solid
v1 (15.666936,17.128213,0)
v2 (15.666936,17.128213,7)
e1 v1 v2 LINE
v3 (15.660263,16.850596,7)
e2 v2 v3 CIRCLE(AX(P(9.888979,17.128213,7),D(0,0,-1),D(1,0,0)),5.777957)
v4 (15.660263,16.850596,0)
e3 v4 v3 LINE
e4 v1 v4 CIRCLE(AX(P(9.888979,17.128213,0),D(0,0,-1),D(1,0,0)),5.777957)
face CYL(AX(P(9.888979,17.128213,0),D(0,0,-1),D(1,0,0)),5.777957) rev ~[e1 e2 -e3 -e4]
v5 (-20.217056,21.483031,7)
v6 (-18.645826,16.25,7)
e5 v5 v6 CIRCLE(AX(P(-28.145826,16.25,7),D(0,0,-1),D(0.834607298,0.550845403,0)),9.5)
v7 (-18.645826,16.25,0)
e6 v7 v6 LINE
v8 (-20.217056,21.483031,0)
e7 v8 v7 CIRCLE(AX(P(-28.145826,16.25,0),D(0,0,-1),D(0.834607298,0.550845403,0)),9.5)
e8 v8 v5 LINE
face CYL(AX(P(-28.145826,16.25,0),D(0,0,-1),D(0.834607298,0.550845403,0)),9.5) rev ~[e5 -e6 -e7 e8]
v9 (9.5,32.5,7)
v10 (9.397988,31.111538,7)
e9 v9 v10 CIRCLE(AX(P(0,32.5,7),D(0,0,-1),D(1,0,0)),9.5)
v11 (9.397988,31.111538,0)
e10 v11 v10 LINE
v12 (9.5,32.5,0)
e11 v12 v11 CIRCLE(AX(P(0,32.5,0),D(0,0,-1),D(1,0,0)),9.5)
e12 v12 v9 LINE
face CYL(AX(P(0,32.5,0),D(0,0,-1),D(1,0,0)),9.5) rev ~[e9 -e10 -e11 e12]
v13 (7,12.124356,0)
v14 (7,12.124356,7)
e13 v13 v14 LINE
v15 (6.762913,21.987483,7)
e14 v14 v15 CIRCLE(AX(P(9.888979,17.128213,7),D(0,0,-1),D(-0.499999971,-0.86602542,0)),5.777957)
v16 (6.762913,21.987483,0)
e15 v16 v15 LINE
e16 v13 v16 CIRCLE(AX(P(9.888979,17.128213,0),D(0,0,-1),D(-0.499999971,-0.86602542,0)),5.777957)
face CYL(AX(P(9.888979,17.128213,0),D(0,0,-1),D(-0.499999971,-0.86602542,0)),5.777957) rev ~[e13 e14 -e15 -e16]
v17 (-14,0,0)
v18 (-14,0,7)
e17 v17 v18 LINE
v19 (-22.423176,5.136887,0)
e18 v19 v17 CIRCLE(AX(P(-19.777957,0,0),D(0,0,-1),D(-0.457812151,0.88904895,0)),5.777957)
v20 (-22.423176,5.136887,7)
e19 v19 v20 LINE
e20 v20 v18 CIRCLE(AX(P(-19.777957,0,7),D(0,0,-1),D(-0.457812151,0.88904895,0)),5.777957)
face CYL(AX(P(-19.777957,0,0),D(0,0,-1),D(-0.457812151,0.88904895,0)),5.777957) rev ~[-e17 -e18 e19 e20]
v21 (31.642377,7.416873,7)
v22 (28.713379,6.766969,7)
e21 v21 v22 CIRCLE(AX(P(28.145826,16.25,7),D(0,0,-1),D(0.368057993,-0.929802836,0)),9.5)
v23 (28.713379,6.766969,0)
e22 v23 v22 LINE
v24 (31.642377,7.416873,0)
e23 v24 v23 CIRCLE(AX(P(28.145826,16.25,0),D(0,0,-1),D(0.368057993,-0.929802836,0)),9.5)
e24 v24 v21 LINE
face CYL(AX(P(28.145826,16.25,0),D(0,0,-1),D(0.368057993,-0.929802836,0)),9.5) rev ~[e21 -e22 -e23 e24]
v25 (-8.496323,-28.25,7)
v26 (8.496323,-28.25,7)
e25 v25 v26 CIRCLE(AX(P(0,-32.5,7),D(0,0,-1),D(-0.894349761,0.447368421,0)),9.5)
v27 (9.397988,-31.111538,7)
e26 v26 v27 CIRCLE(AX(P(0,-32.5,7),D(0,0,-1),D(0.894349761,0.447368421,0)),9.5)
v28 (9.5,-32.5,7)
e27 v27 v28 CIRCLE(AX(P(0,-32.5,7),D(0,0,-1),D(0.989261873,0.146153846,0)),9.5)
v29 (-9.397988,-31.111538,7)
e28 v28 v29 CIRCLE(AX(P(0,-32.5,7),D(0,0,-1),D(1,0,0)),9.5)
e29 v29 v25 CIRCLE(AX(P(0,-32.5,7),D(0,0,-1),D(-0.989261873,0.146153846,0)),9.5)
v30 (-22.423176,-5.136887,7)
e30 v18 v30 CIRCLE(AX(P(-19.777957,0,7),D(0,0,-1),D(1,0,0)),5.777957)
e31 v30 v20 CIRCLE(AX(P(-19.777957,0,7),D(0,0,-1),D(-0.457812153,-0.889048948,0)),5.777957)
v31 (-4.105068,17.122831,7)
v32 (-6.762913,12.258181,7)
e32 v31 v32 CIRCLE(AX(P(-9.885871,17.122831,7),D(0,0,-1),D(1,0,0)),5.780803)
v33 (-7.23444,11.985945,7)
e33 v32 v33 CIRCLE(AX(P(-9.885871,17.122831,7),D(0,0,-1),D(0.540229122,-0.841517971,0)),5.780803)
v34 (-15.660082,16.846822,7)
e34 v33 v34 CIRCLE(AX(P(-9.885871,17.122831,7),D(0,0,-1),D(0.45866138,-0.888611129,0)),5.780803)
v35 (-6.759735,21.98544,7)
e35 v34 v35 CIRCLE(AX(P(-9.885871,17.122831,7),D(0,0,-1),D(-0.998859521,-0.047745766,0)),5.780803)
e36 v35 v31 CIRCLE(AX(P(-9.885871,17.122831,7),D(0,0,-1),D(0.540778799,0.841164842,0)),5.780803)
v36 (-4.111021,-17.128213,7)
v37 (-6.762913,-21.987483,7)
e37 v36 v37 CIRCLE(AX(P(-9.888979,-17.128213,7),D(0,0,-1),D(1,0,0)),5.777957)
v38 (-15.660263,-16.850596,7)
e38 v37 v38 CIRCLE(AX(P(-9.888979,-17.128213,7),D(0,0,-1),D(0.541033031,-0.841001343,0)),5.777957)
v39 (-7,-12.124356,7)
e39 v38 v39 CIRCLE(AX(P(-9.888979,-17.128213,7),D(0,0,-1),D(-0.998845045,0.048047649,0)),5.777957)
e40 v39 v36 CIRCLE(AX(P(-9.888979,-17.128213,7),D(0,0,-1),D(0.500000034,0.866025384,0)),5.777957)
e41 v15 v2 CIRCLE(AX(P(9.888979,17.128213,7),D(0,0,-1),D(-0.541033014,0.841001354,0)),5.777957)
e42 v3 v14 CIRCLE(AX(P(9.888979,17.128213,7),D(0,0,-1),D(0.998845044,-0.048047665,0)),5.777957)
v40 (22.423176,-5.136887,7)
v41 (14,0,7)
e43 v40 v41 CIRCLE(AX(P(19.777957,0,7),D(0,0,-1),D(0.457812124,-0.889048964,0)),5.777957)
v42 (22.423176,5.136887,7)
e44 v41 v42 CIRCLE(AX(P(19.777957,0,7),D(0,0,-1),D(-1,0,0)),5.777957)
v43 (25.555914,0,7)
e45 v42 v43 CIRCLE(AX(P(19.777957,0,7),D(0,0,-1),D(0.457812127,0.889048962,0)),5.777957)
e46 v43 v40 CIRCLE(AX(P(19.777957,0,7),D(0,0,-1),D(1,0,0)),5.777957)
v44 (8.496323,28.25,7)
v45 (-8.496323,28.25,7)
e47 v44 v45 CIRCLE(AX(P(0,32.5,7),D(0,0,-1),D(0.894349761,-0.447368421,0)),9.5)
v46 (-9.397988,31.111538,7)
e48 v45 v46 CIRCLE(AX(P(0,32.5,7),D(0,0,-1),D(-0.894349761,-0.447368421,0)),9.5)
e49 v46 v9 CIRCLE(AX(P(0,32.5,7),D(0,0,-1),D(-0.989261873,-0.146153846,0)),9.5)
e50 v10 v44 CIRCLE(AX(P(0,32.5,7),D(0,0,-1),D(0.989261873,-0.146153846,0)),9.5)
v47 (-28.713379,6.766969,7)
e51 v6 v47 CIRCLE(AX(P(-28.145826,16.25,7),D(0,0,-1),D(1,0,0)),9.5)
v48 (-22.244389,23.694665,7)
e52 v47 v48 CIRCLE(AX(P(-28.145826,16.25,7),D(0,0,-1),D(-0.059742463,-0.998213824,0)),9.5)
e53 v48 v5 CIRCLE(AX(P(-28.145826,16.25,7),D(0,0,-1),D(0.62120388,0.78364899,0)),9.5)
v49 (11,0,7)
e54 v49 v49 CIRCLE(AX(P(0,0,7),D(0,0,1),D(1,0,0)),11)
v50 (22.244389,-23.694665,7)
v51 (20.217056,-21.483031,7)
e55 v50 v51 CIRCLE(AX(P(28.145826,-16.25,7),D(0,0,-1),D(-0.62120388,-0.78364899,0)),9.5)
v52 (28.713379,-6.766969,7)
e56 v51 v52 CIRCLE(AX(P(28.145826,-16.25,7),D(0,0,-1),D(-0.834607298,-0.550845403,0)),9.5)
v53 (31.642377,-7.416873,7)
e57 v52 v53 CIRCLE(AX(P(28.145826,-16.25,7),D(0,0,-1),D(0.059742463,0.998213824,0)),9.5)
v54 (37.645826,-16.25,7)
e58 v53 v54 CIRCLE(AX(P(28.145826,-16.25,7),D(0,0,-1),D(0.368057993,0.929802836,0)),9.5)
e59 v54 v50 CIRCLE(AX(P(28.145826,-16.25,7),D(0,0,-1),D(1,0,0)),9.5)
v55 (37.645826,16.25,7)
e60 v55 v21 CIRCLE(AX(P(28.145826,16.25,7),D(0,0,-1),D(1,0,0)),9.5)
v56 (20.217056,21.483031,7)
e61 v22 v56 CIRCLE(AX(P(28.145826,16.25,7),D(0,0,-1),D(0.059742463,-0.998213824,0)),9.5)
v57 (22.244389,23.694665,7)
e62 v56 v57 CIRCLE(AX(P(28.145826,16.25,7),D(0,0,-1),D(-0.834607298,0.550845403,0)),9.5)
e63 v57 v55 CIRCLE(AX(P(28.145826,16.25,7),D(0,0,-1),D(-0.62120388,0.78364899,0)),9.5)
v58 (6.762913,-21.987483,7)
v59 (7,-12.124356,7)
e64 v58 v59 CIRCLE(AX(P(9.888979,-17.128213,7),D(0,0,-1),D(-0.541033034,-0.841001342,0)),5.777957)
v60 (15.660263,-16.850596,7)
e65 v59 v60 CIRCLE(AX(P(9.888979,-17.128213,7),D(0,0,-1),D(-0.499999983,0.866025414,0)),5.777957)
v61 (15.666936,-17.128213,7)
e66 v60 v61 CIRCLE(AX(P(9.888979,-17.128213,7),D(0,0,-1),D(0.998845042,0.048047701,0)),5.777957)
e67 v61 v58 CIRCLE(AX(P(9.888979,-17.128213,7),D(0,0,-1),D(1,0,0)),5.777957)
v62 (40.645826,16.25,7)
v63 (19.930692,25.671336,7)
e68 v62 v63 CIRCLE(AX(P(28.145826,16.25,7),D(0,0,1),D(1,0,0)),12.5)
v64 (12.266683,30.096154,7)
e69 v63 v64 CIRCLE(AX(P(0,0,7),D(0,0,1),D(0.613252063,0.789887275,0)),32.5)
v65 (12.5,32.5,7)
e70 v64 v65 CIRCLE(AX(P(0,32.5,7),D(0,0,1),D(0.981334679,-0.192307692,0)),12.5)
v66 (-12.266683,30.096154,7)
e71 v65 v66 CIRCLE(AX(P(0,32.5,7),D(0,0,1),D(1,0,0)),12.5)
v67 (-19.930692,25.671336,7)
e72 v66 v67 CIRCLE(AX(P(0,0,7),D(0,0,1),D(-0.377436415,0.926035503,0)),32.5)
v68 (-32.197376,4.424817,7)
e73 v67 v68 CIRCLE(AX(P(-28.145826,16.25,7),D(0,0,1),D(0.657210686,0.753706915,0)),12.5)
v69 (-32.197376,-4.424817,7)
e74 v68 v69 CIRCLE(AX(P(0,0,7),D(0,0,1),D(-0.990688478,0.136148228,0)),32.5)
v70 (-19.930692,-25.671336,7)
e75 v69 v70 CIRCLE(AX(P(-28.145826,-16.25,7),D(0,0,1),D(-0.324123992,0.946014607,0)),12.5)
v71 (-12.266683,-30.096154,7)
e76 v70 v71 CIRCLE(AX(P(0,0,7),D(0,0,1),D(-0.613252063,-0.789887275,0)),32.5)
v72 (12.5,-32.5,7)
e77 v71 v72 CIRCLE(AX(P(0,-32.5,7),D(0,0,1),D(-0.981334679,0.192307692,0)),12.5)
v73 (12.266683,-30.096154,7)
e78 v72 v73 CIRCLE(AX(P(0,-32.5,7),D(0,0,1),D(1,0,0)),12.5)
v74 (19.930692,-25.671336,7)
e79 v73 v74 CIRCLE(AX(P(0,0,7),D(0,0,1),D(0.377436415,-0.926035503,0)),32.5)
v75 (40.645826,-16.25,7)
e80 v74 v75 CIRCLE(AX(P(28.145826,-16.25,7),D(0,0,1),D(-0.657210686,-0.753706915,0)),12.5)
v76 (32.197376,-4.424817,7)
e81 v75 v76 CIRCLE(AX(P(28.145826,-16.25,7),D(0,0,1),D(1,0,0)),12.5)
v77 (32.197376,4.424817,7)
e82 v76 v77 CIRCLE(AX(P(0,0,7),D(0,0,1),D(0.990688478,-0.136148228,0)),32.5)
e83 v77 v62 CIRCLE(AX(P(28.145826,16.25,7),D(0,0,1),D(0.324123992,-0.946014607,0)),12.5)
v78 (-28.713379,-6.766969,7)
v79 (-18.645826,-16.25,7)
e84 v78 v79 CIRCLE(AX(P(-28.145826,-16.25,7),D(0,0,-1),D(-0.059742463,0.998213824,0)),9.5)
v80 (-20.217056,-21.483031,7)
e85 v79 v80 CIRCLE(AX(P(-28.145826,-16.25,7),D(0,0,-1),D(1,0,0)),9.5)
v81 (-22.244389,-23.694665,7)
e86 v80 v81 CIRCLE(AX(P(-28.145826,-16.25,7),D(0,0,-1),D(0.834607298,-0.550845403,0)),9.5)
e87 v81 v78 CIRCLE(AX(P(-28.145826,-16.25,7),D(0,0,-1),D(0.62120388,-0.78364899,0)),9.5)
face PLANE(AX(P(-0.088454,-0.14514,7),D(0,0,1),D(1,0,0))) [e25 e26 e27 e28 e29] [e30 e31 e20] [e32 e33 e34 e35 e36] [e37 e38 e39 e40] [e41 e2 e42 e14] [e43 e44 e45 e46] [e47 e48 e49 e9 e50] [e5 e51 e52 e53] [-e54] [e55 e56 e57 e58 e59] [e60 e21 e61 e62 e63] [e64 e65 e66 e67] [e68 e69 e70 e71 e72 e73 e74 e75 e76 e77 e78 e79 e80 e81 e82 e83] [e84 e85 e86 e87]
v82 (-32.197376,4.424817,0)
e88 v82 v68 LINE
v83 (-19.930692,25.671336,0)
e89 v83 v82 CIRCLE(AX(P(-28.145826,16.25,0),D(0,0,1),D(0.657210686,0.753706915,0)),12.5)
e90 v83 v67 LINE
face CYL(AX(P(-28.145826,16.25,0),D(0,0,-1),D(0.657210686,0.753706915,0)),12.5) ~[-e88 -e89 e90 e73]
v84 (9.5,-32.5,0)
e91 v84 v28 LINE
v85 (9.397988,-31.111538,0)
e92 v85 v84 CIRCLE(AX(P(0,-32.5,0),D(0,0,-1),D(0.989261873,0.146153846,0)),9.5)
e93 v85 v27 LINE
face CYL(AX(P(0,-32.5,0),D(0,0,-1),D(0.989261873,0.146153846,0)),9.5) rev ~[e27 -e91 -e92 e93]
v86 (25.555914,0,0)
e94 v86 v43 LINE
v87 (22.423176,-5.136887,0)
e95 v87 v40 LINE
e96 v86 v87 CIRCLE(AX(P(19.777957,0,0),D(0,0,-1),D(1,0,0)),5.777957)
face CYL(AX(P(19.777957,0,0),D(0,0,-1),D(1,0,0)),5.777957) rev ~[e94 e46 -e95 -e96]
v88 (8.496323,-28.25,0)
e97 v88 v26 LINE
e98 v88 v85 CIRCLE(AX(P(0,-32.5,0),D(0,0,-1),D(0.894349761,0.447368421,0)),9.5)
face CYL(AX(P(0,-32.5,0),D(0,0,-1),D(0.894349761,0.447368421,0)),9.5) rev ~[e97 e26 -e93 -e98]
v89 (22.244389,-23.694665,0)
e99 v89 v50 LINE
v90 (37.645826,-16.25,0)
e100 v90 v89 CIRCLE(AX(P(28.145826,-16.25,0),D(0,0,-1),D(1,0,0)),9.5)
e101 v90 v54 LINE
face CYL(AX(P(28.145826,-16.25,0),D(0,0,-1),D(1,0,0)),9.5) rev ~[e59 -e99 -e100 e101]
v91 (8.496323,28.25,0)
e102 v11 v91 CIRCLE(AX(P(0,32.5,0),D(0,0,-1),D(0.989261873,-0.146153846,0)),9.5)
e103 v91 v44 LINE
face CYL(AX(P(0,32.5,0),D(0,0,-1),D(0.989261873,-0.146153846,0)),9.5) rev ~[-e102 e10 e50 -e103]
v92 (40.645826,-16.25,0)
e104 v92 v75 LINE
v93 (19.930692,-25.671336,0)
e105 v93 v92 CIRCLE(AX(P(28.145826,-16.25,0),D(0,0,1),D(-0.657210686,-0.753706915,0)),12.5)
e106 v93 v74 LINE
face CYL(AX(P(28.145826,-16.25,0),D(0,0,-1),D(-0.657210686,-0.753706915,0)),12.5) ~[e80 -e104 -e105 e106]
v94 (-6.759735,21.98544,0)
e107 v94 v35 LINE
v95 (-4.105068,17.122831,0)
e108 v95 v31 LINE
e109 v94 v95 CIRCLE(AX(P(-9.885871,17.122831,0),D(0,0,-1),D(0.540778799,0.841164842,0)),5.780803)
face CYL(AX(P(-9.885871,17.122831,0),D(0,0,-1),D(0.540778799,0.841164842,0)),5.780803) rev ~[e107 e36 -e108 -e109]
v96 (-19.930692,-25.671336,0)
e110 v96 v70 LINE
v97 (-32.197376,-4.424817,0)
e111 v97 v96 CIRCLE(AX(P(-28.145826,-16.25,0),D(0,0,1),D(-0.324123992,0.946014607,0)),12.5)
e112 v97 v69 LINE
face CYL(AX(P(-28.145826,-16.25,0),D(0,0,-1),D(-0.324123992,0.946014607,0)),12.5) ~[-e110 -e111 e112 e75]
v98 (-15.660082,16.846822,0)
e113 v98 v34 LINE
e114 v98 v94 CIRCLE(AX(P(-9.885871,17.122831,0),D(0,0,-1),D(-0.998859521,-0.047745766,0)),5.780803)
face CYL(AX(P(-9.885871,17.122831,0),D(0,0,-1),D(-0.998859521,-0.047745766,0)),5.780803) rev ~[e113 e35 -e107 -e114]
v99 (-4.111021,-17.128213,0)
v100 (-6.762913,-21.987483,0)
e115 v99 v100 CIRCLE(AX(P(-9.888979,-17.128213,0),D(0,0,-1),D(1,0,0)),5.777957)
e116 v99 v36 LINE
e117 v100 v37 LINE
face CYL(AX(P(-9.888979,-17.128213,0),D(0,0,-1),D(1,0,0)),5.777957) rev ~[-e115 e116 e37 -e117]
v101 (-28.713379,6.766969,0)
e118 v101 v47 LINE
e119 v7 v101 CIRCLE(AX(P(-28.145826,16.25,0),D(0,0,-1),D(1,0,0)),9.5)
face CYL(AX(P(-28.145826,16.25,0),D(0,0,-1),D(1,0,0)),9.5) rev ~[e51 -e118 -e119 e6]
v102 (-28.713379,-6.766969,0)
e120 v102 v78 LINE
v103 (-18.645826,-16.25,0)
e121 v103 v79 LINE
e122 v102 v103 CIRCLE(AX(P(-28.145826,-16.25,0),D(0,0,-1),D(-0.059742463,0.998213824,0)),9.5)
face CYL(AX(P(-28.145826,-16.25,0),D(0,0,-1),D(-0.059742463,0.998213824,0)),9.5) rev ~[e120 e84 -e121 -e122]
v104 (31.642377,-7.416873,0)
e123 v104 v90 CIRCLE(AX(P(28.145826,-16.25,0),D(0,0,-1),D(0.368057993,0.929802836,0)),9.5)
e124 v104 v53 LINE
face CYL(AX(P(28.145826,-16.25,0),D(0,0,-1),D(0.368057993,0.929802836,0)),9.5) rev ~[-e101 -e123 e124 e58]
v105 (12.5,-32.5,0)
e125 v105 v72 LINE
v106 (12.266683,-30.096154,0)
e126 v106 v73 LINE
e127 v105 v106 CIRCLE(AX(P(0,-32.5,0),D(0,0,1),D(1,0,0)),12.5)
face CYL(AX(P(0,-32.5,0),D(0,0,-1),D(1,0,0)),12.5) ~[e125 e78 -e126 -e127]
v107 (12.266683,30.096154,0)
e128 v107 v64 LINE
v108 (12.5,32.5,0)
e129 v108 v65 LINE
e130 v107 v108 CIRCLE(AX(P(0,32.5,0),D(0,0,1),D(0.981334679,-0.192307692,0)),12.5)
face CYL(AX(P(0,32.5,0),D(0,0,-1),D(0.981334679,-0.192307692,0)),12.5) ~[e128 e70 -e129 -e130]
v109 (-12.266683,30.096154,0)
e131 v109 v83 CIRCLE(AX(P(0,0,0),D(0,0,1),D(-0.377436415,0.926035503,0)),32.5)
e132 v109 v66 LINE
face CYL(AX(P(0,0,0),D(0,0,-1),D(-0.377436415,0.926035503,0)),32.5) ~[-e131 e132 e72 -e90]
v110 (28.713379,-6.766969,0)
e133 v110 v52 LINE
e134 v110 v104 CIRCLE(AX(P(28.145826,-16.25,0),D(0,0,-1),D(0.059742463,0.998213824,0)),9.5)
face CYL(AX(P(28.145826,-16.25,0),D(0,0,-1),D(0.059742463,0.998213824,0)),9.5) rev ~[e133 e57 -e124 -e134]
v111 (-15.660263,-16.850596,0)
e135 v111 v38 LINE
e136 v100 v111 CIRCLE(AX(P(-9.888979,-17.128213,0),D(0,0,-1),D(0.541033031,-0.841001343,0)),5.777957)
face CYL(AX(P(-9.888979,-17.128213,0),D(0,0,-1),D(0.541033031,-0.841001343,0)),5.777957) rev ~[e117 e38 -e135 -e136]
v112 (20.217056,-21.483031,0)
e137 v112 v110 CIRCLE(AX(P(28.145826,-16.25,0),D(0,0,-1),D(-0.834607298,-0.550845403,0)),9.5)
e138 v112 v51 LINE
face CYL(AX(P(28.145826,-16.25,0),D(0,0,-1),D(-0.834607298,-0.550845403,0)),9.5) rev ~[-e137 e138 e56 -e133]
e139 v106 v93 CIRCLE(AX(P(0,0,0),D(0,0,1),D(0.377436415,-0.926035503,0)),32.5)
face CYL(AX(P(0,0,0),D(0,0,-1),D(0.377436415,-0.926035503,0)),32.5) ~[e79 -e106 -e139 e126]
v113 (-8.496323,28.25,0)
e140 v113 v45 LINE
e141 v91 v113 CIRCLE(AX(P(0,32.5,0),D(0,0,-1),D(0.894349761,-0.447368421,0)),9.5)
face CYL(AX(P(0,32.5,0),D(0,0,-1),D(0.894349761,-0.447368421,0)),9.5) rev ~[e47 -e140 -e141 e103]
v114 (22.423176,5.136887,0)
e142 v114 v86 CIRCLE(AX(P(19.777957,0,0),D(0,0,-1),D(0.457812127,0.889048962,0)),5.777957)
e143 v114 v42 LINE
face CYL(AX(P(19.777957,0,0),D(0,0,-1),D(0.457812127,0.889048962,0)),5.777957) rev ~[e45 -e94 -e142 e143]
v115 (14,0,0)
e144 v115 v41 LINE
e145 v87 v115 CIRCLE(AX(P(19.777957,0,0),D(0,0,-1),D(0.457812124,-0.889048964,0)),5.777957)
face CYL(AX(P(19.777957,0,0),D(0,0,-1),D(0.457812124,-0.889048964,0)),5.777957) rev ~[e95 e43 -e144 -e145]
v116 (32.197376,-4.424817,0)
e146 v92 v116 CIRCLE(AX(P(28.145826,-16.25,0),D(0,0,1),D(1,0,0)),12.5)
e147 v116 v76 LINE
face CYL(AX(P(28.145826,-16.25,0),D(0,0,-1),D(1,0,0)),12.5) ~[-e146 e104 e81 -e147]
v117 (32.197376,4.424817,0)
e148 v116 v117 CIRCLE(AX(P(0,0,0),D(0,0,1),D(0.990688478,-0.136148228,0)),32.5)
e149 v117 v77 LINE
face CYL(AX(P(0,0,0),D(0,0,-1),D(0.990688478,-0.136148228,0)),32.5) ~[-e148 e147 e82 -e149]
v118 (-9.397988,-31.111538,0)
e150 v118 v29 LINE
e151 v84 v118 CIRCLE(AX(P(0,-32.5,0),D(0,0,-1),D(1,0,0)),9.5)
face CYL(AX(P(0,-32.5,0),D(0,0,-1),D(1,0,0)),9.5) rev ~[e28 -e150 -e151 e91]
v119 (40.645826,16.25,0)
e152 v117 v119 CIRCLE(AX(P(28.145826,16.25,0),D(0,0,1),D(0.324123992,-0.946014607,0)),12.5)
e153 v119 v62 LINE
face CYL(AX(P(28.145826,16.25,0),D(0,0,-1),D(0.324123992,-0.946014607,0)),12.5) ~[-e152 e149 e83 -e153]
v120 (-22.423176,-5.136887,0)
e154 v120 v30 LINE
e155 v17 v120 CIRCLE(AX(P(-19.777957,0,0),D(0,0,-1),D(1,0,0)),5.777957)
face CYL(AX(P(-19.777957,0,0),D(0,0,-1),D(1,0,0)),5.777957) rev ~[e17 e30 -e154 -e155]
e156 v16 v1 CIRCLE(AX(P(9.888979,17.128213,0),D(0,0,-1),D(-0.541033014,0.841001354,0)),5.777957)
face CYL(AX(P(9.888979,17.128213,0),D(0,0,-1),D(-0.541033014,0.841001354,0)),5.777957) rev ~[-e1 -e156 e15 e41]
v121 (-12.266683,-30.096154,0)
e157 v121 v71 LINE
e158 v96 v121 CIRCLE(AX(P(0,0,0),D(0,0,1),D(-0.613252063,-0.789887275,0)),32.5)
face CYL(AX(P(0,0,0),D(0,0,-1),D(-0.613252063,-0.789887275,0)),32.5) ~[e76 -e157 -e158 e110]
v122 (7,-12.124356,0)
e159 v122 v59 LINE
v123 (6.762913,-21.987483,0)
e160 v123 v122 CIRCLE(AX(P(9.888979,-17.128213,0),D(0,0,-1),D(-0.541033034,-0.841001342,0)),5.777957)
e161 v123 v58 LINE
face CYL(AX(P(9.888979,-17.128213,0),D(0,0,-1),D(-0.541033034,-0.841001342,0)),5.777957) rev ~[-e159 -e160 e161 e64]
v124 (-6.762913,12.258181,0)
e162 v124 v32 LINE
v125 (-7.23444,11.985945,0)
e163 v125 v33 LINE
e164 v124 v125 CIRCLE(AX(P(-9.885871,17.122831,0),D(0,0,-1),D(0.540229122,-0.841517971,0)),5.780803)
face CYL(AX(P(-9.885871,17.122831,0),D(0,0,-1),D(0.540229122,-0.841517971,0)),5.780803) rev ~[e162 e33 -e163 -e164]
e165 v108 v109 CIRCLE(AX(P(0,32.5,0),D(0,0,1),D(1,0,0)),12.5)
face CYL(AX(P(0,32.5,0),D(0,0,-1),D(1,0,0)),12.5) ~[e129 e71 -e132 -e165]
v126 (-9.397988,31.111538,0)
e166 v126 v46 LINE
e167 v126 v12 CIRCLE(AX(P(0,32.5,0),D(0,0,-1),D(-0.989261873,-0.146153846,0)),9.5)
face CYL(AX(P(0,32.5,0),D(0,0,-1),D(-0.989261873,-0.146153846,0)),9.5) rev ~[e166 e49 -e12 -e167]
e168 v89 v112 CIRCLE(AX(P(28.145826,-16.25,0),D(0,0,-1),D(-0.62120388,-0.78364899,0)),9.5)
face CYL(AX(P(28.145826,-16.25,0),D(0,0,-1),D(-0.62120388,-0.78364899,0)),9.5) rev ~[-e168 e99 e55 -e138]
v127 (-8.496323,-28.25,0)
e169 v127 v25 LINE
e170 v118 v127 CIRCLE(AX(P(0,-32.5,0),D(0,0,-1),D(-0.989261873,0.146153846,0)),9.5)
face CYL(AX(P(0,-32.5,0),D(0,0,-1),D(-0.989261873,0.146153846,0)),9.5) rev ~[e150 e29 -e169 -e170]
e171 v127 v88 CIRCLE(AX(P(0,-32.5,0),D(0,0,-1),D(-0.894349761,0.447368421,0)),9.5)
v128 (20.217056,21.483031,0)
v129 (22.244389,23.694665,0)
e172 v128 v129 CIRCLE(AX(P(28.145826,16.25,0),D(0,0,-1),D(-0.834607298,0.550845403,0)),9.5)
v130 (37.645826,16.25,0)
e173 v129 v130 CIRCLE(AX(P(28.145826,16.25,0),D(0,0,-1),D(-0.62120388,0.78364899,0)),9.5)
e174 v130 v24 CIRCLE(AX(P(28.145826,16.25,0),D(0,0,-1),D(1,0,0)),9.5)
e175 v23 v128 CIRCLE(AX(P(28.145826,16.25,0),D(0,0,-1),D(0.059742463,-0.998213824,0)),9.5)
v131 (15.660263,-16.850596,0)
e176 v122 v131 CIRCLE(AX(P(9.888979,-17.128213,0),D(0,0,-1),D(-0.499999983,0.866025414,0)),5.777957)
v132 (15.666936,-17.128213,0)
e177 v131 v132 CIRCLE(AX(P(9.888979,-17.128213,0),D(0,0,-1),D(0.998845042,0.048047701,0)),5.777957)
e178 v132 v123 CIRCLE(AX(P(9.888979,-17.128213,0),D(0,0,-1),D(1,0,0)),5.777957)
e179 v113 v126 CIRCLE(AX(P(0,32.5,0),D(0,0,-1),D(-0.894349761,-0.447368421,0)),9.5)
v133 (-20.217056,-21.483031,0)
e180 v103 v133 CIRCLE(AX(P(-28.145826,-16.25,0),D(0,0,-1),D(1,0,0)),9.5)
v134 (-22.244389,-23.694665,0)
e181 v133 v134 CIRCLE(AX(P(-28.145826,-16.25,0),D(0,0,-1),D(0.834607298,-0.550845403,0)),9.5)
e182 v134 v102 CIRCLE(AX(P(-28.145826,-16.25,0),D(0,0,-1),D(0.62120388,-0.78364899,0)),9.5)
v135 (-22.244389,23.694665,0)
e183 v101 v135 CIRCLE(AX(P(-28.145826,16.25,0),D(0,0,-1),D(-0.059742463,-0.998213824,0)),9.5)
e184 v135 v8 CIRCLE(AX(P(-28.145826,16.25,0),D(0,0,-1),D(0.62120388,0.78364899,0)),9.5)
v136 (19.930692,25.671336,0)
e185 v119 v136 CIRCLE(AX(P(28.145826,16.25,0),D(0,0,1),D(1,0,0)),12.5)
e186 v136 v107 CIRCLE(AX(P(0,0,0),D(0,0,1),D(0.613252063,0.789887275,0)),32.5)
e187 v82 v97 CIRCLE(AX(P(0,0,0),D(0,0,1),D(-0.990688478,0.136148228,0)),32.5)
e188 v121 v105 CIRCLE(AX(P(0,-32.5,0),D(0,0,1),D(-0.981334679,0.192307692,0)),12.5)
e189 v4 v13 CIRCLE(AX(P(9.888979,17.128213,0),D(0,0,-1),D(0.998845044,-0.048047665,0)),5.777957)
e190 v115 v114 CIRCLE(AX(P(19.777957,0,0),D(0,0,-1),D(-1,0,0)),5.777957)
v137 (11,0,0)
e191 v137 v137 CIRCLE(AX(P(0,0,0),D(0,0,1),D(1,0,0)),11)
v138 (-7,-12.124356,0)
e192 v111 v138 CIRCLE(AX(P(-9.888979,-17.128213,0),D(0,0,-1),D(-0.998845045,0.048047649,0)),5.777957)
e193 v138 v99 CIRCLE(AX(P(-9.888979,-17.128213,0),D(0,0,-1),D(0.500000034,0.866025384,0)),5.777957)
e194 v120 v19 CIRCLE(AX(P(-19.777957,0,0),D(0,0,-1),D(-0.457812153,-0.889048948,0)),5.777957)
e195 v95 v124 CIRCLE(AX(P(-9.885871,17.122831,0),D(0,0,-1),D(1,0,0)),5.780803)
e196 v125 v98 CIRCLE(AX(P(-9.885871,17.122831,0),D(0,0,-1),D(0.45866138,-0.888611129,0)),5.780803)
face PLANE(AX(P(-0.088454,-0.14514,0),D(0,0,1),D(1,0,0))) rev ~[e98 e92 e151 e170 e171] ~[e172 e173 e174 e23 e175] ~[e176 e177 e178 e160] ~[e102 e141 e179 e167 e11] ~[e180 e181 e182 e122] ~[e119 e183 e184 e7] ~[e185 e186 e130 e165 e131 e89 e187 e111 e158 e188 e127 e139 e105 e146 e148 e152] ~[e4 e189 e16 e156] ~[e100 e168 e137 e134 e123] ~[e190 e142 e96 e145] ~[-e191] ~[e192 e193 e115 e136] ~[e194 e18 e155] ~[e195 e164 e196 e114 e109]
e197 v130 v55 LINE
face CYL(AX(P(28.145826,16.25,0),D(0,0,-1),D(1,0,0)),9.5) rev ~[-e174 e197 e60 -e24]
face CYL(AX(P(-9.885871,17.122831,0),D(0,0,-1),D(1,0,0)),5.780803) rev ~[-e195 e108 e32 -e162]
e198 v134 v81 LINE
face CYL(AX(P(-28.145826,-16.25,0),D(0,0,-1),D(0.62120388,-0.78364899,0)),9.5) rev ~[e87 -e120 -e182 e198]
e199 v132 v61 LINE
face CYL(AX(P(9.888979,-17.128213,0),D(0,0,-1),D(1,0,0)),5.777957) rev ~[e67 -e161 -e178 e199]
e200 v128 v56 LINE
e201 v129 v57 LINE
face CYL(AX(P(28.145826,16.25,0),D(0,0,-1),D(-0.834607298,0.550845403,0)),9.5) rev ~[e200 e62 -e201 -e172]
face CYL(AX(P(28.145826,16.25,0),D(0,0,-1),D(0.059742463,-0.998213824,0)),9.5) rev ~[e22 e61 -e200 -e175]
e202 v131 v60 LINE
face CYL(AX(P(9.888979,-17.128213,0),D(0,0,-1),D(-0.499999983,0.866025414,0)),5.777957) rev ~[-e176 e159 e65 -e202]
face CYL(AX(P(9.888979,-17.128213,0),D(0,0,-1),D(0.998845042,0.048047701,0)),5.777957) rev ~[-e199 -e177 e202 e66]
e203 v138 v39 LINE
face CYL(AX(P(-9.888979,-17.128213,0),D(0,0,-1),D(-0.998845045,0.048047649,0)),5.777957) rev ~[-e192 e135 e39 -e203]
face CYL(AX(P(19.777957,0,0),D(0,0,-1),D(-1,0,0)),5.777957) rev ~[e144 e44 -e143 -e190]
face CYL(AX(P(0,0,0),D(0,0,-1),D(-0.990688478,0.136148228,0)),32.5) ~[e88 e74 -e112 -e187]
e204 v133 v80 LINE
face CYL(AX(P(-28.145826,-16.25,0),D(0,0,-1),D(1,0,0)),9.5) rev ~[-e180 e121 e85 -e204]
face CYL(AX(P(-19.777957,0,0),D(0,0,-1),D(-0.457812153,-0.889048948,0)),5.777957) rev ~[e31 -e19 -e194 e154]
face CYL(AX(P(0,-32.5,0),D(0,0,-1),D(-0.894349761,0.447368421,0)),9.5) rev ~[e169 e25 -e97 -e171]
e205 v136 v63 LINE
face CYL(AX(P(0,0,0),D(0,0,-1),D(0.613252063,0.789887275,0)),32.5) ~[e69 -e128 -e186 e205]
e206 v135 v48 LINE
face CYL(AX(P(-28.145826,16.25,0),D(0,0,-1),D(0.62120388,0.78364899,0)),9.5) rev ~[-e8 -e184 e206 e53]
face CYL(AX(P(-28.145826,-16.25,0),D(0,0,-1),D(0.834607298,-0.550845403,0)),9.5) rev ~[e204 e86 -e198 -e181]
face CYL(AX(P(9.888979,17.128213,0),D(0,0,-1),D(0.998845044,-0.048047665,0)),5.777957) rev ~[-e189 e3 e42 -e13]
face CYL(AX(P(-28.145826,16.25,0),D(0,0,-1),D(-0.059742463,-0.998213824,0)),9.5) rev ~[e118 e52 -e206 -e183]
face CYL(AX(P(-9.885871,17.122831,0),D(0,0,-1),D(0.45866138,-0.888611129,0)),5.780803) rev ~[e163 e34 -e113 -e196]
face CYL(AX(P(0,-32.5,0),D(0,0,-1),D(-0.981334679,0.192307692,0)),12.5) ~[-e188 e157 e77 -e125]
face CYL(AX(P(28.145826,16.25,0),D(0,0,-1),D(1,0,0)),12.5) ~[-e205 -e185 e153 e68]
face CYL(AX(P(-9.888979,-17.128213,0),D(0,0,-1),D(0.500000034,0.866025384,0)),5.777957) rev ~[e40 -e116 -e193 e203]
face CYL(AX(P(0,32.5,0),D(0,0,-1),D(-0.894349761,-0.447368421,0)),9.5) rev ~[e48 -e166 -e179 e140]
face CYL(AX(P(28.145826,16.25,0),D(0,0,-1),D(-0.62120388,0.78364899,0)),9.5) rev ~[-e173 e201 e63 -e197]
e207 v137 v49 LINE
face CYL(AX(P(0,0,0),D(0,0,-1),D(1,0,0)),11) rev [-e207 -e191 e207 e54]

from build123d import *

# Parameters (mm, degrees)
F0_R     = 11
F1_DEPTH = 7


with BuildPart() as f1:
    # F0 (on Top) → F1 (new body)
    with BuildSketch(Plane.XY):
        with BuildLine():
            ThreePointArc((7.0000001006, -12.1243555949), (12.124355682, -6.9999999497), (14, 0))
            ThreePointArc((14, 0), (12.1243557011, 6.9999999166), (7.0000001668, 12.1243555567))
            ThreePointArc((7.0000001668, 12.1243555567), (0.1361246737, 13.9993382013), (-6.7629128968, 12.2581813149))
            ThreePointArc((-6.7629128968, 12.2581813149), (-6.99546954, 12.1165086661), (-7.2344399745, 11.9859450297))
            ThreePointArc((-7.2344399745, 11.9859450297), (-12.191844808, 6.881781759), (-14, 0))
            ThreePointArc((-14, 0), (-12.1243555958, -7.000000099), (-6.999999802, -12.1243557673))
            ThreePointArc((-6.999999802, -12.1243557673), (1.724e-07, -14), (7.0000001006, -12.1243555949))
        make_face()
        Circle(F0_R, mode=Mode.SUBTRACT)
        with BuildLine():
            ThreePointArc((22.4231761247, -5.1368869024), (16.769566617, -4.9329885231), (14, 0))
            ThreePointArc((14, 0), (12.124355682, -6.9999999497), (7.0000001006, -12.1243555949))
            ThreePointArc((7.0000001006, -12.1243555949), (12.6568763598, -12.0563762611), (15.6602625749, -16.8505958477))
            ThreePointArc((15.6602625749, -16.8505958477), (17.3205082906, -9.9999996277), (22.4231761247, -5.1368869024))
        make_face()
        with BuildLine():
            ThreePointArc((7.0000001668, 12.1243555567), (12.1243557011, 6.9999999166), (14, 0))
            ThreePointArc((14, 0), (16.769566627, 4.9329885292), (22.4231761455, 5.1368868917))
            ThreePointArc((22.4231761455, 5.1368868917), (17.3205082443, 9.9999997079), (15.6602625849, 16.8505960559))
            ThreePointArc((15.6602625849, 16.8505960559), (12.6568764848, 12.0563763294), (7.0000001668, 12.1243555567))
        make_face()
        with BuildLine():
            ThreePointArc((-6.7629128968, 12.2581813149), (0.1361246737, 13.9993382013), (7.0000001668, 12.1243555567))
            ThreePointArc((7.0000001668, 12.1243555567), (4.1126899405, 16.9893645646), (6.7629130014, 21.9874832825))
            ThreePointArc((6.7629130014, 21.9874832825), (0.0018890383, 20.0000001427), (-6.759735325, 21.9854396984))
            ThreePointArc((-6.759735325, 21.9854396984), (-4.8119543875, 19.8928592028), (-4.1050678819, 17.1228311923))
            ThreePointArc((-4.1050678819, 17.1228311923), (-4.8128595342, 14.3511458497), (-6.7629128968, 12.2581813149))
        make_face()
        with BuildLine():
            ThreePointArc((6.7629128862, -21.9874832084), (4.1126899412, -16.9893645344), (7.0000001006, -12.1243555949))
            ThreePointArc((7.0000001006, -12.1243555949), (1.724e-07, -14), (-6.999999802, -12.1243557673))
            ThreePointArc((-6.999999802, -12.1243557673), (-4.8851208082, -14.2392348866), (-4.1110213762, -17.1282134114))
            ThreePointArc((-4.1110213762, -17.1282134114), (-4.8171414782, -19.8961111559), (-6.7629128995, -21.987483217))
            ThreePointArc((-6.7629128995, -21.987483217), (-7.9e-09, -20), (6.7629128862, -21.9874832084))
        make_face()
        with BuildLine():
            ThreePointArc((15.6602625849, 16.8505960559), (17.3205082443, 9.9999997079), (22.4231761455, 5.1368868917))
            ThreePointArc((22.4231761455, 5.1368868917), (25.7437624558, 3.9829672479), (29.2543281187, 3.7992481264))
            ThreePointArc((29.2543281187, 3.7992481264), (29.0218126442, 5.2900274902), (28.7133790239, 6.7669686736))
            ThreePointArc((28.7133790239, 6.7669686736), (19.918584287, 11.5), (20.2170562899, 21.4830313264))
            ThreePointArc((20.2170562899, 21.4830313264), (19.0922045153, 22.4886132686), (17.9174094521, 23.4353672582))
            ThreePointArc((17.9174094521, 23.4353672582), (16.3212319377, 20.3032683327), (15.6602625849, 16.8505960559))
        make_face()
        with BuildLine():
            ThreePointArc((29.2543281187, 3.7992481264), (25.7437624558, 3.9829672479), (22.4231761455, 5.1368868917))
            ThreePointArc((22.4231761455, 5.1368868917), (24.7109457768, 3.0083906207), (25.5559144953, 0))
            ThreePointArc((25.5559144953, 0), (24.7109457708, -3.0083906307), (22.4231761247, -5.1368869024))
            ThreePointArc((22.4231761247, -5.1368869024), (25.7437624444, -3.9829672502), (29.2543281187, -3.7992481264))
            ThreePointArc((29.2543281187, -3.7992481264), (29.5, 0), (29.2543281187, 3.7992481264))
        make_face()
        with BuildLine():
            ThreePointArc((29.2543281187, -3.7992481264), (25.7437624444, -3.9829672502), (22.4231761247, -5.1368869024))
            ThreePointArc((22.4231761247, -5.1368869024), (17.3205082906, -9.9999996277), (15.6602625749, -16.8505958477))
            ThreePointArc((15.6602625749, -16.8505958477), (16.3212319039, -20.3032682341), (17.9174094521, -23.4353672582))
            ThreePointArc((17.9174094521, -23.4353672582), (19.0922045153, -22.4886132686), (20.2170562899, -21.4830313264))
            ThreePointArc((20.2170562899, -21.4830313264), (19.918584287, -11.5), (28.7133790239, -6.7669686736))
            ThreePointArc((28.7133790239, -6.7669686736), (29.0218126442, -5.2900274902), (29.2543281187, -3.7992481264))
        make_face()
        with BuildLine():
            ThreePointArc((-6.759735325, 21.9854396984), (0.0018890383, 20.0000001427), (6.7629130014, 21.9874832825))
            ThreePointArc((6.7629130014, 21.9874832825), (9.422530203, 24.2862356636), (11.3369186666, 27.2346153846))
            ThreePointArc((11.3369186666, 27.2346153846), (9.9296081288, 27.7786407588), (8.496322734, 28.25))
            ThreePointArc((8.496322734, 28.25), (0, 23), (-8.496322734, 28.25))
            ThreePointArc((-8.496322734, 28.25), (-9.9296081288, 27.7786407588), (-11.3369186666, 27.2346153846))
            ThreePointArc((-11.3369186666, 27.2346153846), (-9.4212888061, 24.2848117957), (-6.759735325, 21.9854396984))
        make_face()
        with BuildLine():
            ThreePointArc((11.3369186666, 27.2346153846), (9.422530203, 24.2862356636), (6.7629130014, 21.9874832825))
            ThreePointArc((6.7629130014, 21.9874832825), (12.6568764214, 22.2000505281), (15.6669358715, 17.1282134114))
            ThreePointArc((15.6669358715, 17.1282134114), (15.6652673089, 16.9893646368), (15.6602625849, 16.8505960559))
            ThreePointArc((15.6602625849, 16.8505960559), (16.3212319377, 20.3032683327), (17.9174094521, 23.4353672582))
            ThreePointArc((17.9174094521, 23.4353672582), (14.75, 25.5477494116), (11.3369186666, 27.2346153846))
        make_face()
        with BuildLine():
            ThreePointArc((-15.6602625894, -16.850596149), (-12.6568763408, -12.0563762508), (-6.999999802, -12.1243557673))
            ThreePointArc((-6.999999802, -12.1243557673), (-12.1243555958, -7.000000099), (-14, 0))
            ThreePointArc((-14, 0), (-16.7695666992, -4.9329885732), (-22.4231762959, -5.1368868142))
            ThreePointArc((-22.4231762959, -5.1368868143), (-17.4738268273, -9.741663676), (-15.645825623, -16.25))
            ThreePointArc((-15.645825623, -16.25), (-15.6494353858, -16.5503848199), (-15.6602625894, -16.850596149))
        make_face()
        with BuildLine():
            ThreePointArc((17.9174094521, -23.4353672582), (16.3212319039, -20.3032682341), (15.6602625749, -16.8505958477))
            ThreePointArc((15.6602625749, -16.8505958477), (15.6652673064, -16.9893645326), (15.6669358715, -17.1282134114))
            ThreePointArc((15.6669358715, -17.1282134114), (12.6568763613, -22.2000505609), (6.7629128862, -21.9874832084))
            ThreePointArc((6.7629128862, -21.9874832084), (9.422530158, -24.286235612), (11.3369186666, -27.2346153846))
            ThreePointArc((11.3369186666, -27.2346153846), (14.75, -25.5477494116), (17.9174094521, -23.4353672582))
        make_face()
        with BuildLine():
            ThreePointArc((11.3369186666, -27.2346153846), (9.422530158, -24.286235612), (6.7629128862, -21.9874832084))
            ThreePointArc((6.7629128862, -21.9874832084), (-7.9e-09, -20), (-6.7629128995, -21.987483217))
            ThreePointArc((-6.7629128995, -21.987483217), (-9.4225301632, -24.286235618), (-11.3369186666, -27.2346153846))
            ThreePointArc((-11.3369186666, -27.2346153846), (-9.9296081288, -27.7786407588), (-8.496322734, -28.25))
            ThreePointArc((-8.496322734, -28.25), (0, -23), (8.496322734, -28.25))
            ThreePointArc((8.496322734, -28.25), (9.9296081288, -27.7786407588), (11.3369186666, -27.2346153846))
        make_face()
        with BuildLine():
            ThreePointArc((28.7133790239, 6.7669686736), (29.0218126442, 5.2900274902), (29.2543281187, 3.7992481264))
            ThreePointArc((29.2543281187, 3.7992481264), (30.7447425948, 4.0231594198), (32.1973755284, 4.4248174067))
            ThreePointArc((32.1973755284, 4.4248174067), (31.9549148923, 5.9273446187), (31.642376555, 7.4168730576))
            ThreePointArc((31.642376555, 7.4168730576), (30.2036958653, 6.9755636254), (28.7133790239, 6.7669686736))
        make_face()
        with BuildLine():
            ThreePointArc((32.1973755284, 4.4248174067), (30.7447425948, 4.0231594198), (29.2543281187, 3.7992481264))
            ThreePointArc((29.2543281187, 3.7992481264), (29.5, 0), (29.2543281187, -3.7992481264))
            ThreePointArc((29.2543281187, -3.7992481264), (30.7447425948, -4.0231594198), (32.1973755284, -4.4248174067))
            ThreePointArc((32.1973755284, -4.4248174067), (32.5, 0), (32.1973755284, 4.4248174067))
        make_face()
        with BuildLine():
            ThreePointArc((32.1973755284, -4.4248174067), (30.7447425948, -4.0231594198), (29.2543281187, -3.7992481264))
            ThreePointArc((29.2543281187, -3.7992481264), (29.0218126442, -5.2900274902), (28.7133790239, -6.7669686736))
            ThreePointArc((28.7133790239, -6.7669686736), (30.2036958653, -6.9755636254), (31.642376555, -7.4168730576))
            ThreePointArc((31.642376555, -7.4168730576), (31.9549148923, -5.9273446187), (32.1973755284, -4.4248174067))
        make_face()
        with BuildLine():
            ThreePointArc((-14, 0), (-12.191844808, 6.881781759), (-7.2344399745, 11.9859450297))
            ThreePointArc((-7.2344399745, 11.9859450297), (-12.7746372788, 12.1155647212), (-15.660081627, 16.8468223075))
            ThreePointArc((-15.660081627, 16.8468223075), (-15.6493901322, 16.5484962731), (-15.645825623, 16.25))
            ThreePointArc((-15.645825623, 16.25), (-17.473826823, 9.7416636832), (-22.423176281, 5.1368868219))
            ThreePointArc((-22.423176281, 5.1368868219), (-16.769566692, 4.9329885689), (-14, 0))
        make_face()
        with BuildLine():
            ThreePointArc((-15.660081627, 16.8468223075), (-12.7762728806, 22.1291537044), (-6.759735325, 21.9854396984))
            ThreePointArc((-6.759735325, 21.9854396984), (-9.4212888061, 24.2848117957), (-11.3369186666, 27.2346153846))
            ThreePointArc((-11.3369186666, 27.2346153846), (-14.75, 25.5477494116), (-17.9174094521, 23.4353672582))
            ThreePointArc((-17.9174094521, 23.4353672582), (-16.3206195291, 20.3014813138), (-15.660081627, 16.8468223075))
        make_face()
        with BuildLine():
            ThreePointArc((8.496322734, 28.25), (9.9296081288, 27.7786407588), (11.3369186666, 27.2346153846))
            ThreePointArc((11.3369186666, 27.2346153846), (11.8882130364, 28.6373078299), (12.2666834829, 30.0961538462))
            ThreePointArc((12.2666834829, 30.0961538462), (10.8442264294, 30.6374403818), (9.3979877929, 31.1115384615))
            ThreePointArc((9.3979877929, 31.1115384615), (9.0608326273, 29.6449497203), (8.496322734, 28.25))
        make_face()
        with BuildLine():
            ThreePointArc((12.2666834829, 30.0961538462), (11.8882130364, 28.6373078299), (11.3369186666, 27.2346153846))
            ThreePointArc((11.3369186666, 27.2346153846), (14.75, 25.5477494116), (17.9174094521, 23.4353672582))
            ThreePointArc((17.9174094521, 23.4353672582), (18.8565295584, 24.61414841), (19.9306920455, 25.6713364394))
            ThreePointArc((19.9306920455, 25.6713364394), (16.25, 28.145825623), (12.2666834829, 30.0961538462))
        make_face()
        with BuildLine():
            ThreePointArc((19.9306920455, 25.6713364394), (18.8565295584, 24.61414841), (17.9174094521, 23.4353672582))
            ThreePointArc((17.9174094521, 23.4353672582), (19.0922045153, 22.4886132686), (20.2170562899, 21.4830313264))
            ThreePointArc((20.2170562899, 21.4830313264), (21.142863238, 22.6693860948), (22.244388762, 23.6946654039))
            ThreePointArc((22.244388762, 23.6946654039), (21.1106884629, 24.7100957631), (19.9306920455, 25.6713364394))
        make_face()
        with BuildLine():
            ThreePointArc((-6.7629128995, -21.987483217), (-12.7779571757, -22.1320712114), (-15.6602625894, -16.850596149))
            ThreePointArc((-15.6602625894, -16.850596149), (-16.3212319528, -20.3032683768), (-17.9174094521, -23.4353672582))
            ThreePointArc((-17.9174094521, -23.4353672582), (-14.75, -25.5477494116), (-11.3369186666, -27.2346153846))
            ThreePointArc((-11.3369186666, -27.2346153846), (-9.4225301632, -24.286235618), (-6.7629128995, -21.987483217))
        make_face()
        with BuildLine():
            ThreePointArc((-17.9174094521, -23.4353672582), (-16.3212319528, -20.3032683768), (-15.6602625894, -16.850596149))
            ThreePointArc((-15.6602625894, -16.850596149), (-15.6494353858, -16.5503848199), (-15.645825623, -16.25))
            ThreePointArc((-15.645825623, -16.25), (-17.4738268273, -9.741663676), (-22.4231762959, -5.1368868143))
            ThreePointArc((-22.4231762959, -5.1368868143), (-25.7437625388, -3.9829672317), (-29.2543281187, -3.7992481264))
            ThreePointArc((-29.2543281187, -3.7992481264), (-29.0218126442, -5.2900274902), (-28.7133790239, -6.7669686736))
            ThreePointArc((-28.7133790239, -6.7669686736), (-21.6320616308, -9.3347358218), (-18.645825623, -16.25))
            ThreePointArc((-18.645825623, -16.25), (-19.0471084424, -18.9819124561), (-20.2170562899, -21.4830313264))
            ThreePointArc((-20.2170562899, -21.4830313264), (-19.0922045153, -22.4886132686), (-17.9174094521, -23.4353672582))
        make_face()
        with BuildLine():
            ThreePointArc((20.2170562899, -21.4830313264), (19.0922045153, -22.4886132686), (17.9174094521, -23.4353672582))
            ThreePointArc((17.9174094521, -23.4353672582), (18.8565295584, -24.61414841), (19.9306920455, -25.6713364394))
            ThreePointArc((19.9306920455, -25.6713364394), (21.1106884629, -24.7100957631), (22.244388762, -23.6946654039))
            ThreePointArc((22.244388762, -23.6946654039), (21.142863238, -22.6693860948), (20.2170562899, -21.4830313264))
        make_face()
        with BuildLine():
            ThreePointArc((19.9306920455, -25.6713364394), (18.8565295584, -24.61414841), (17.9174094521, -23.4353672582))
            ThreePointArc((17.9174094521, -23.4353672582), (14.75, -25.5477494116), (11.3369186666, -27.2346153846))
            ThreePointArc((11.3369186666, -27.2346153846), (11.8882130364, -28.6373078299), (12.2666834829, -30.0961538462))
            ThreePointArc((12.2666834829, -30.0961538462), (16.25, -28.145825623), (19.9306920455, -25.6713364394))
        make_face()
        with BuildLine():
            ThreePointArc((12.2666834829, -30.0961538462), (11.8882130364, -28.6373078299), (11.3369186666, -27.2346153846))
            ThreePointArc((11.3369186666, -27.2346153846), (9.9296081288, -27.7786407588), (8.496322734, -28.25))
            ThreePointArc((8.496322734, -28.25), (9.0608326273, -29.6449497203), (9.3979877929, -31.1115384615))
            ThreePointArc((9.3979877929, -31.1115384615), (10.8442264294, -30.6374403818), (12.2666834829, -30.0961538462))
        make_face()
        with BuildLine():
            ThreePointArc((31.642376555, 7.4168730576), (31.9549148923, 5.9273446187), (32.1973755284, 4.4248174067))
            ThreePointArc((32.1973755284, 4.4248174067), (38.3167246447, 8.9834455833), (40.645825623, 16.25))
            ThreePointArc((40.645825623, 16.25), (33.3208053467, 27.6284702337), (19.9306920455, 25.6713364394))
            ThreePointArc((19.9306920455, 25.6713364394), (21.1106884629, 24.7100957631), (22.244388762, 23.6946654039))
            ThreePointArc((22.244388762, 23.6946654039), (32.2802149262, 24.8031763158), (37.645825623, 16.25))
            ThreePointArc((37.645825623, 16.25), (36.0028999466, 10.9099266791), (31.642376555, 7.4168730576))
        make_face()
        with BuildLine():
            ThreePointArc((40.645825623, -16.25), (38.3167246447, -8.9834455833), (32.1973755284, -4.4248174067))
            ThreePointArc((32.1973755284, -4.4248174067), (31.9549148923, -5.9273446187), (31.642376555, -7.4168730576))
            ThreePointArc((31.642376555, -7.4168730576), (36.0028999466, -10.9099266791), (37.645825623, -16.25))
            ThreePointArc((37.645825623, -16.25), (32.2802149262, -24.8031763158), (22.244388762, -23.6946654039))
            ThreePointArc((22.244388762, -23.6946654039), (21.1106884629, -24.7100957631), (19.9306920455, -25.6713364394))
            ThreePointArc((19.9306920455, -25.6713364394), (33.3208053467, -27.6284702337), (40.645825623, -16.25))
        make_face()
        with BuildLine():
            ThreePointArc((-15.645825623, 16.25), (-15.6493901322, 16.5484962731), (-15.660081627, 16.8468223075))
            ThreePointArc((-15.660081627, 16.8468223075), (-16.3206195291, 20.3014813138), (-17.9174094521, 23.4353672582))
            ThreePointArc((-17.9174094521, 23.4353672582), (-19.0922045153, 22.4886132686), (-20.2170562899, 21.4830313264))
            ThreePointArc((-20.2170562899, 21.4830313264), (-19.0471084424, 18.9819124561), (-18.645825623, 16.25))
            ThreePointArc((-18.645825623, 16.25), (-21.6320616308, 9.3347358218), (-28.7133790239, 6.7669686736))
            ThreePointArc((-28.7133790239, 6.7669686736), (-29.0218126442, 5.2900274902), (-29.2543281187, 3.7992481264))
            ThreePointArc((-29.2543281187, 3.7992481264), (-25.7437625306, 3.9829672333), (-22.423176281, 5.1368868219))
            ThreePointArc((-22.423176281, 5.1368868219), (-17.473826823, 9.7416636832), (-15.645825623, 16.25))
        make_face()
        with BuildLine():
            ThreePointArc((-17.9174094521, 23.4353672582), (-14.75, 25.5477494116), (-11.3369186666, 27.2346153846))
            ThreePointArc((-11.3369186666, 27.2346153846), (-11.8882130364, 28.6373078299), (-12.2666834829, 30.0961538462))
            ThreePointArc((-12.2666834829, 30.0961538462), (-16.25, 28.145825623), (-19.9306920455, 25.6713364394))
            ThreePointArc((-19.9306920455, 25.6713364394), (-18.8565295584, 24.61414841), (-17.9174094521, 23.4353672582))
        make_face()
        with BuildLine():
            ThreePointArc((-12.2666834829, 30.0961538462), (-11.8882130364, 28.6373078299), (-11.3369186666, 27.2346153846))
            ThreePointArc((-11.3369186666, 27.2346153846), (-9.9296081288, 27.7786407588), (-8.496322734, 28.25))
            ThreePointArc((-8.496322734, 28.25), (-9.0608326273, 29.6449497203), (-9.3979877929, 31.1115384615))
            ThreePointArc((-9.3979877929, 31.1115384615), (-10.8442264294, 30.6374403818), (-12.2666834829, 30.0961538462))
        make_face()
        with BuildLine():
            ThreePointArc((9.3979877929, 31.1115384615), (10.8442264294, 30.6374403818), (12.2666834829, 30.0961538462))
            ThreePointArc((12.2666834829, 30.0961538462), (12.4415341404, 31.292428788), (12.5, 32.5))
            ThreePointArc((12.5, 32.5), (-1.207571212, 44.9415341404), (-12.2666834829, 30.0961538462))
            ThreePointArc((-12.2666834829, 30.0961538462), (-10.8442264294, 30.6374403818), (-9.3979877929, 31.1115384615))
            ThreePointArc((-9.3979877929, 31.1115384615), (-0.6961019922, 41.9744626242), (9.5, 32.5))
            ThreePointArc((9.5, 32.5), (9.4744626242, 31.8038980078), (9.3979877929, 31.1115384615))
        make_face()
        with BuildLine():
            ThreePointArc((-22.4231762959, -5.1368868142), (-25.5559144953, 8.4e-09), (-22.423176281, 5.1368868219))
            ThreePointArc((-22.423176281, 5.1368868219), (-25.7437625306, 3.9829672333), (-29.2543281187, 3.7992481264))
            ThreePointArc((-29.2543281187, 3.7992481264), (-29.5, 0), (-29.2543281187, -3.7992481264))
            ThreePointArc((-29.2543281187, -3.7992481264), (-25.7437625388, -3.9829672317), (-22.4231762959, -5.1368868143))
        make_face()
        with BuildLine():
            ThreePointArc((-11.3369186666, -27.2346153846), (-14.75, -25.5477494116), (-17.9174094521, -23.4353672582))
            ThreePointArc((-17.9174094521, -23.4353672582), (-18.8565295584, -24.61414841), (-19.9306920455, -25.6713364394))
            ThreePointArc((-19.9306920455, -25.6713364394), (-16.25, -28.145825623), (-12.2666834829, -30.0961538462))
            ThreePointArc((-12.2666834829, -30.0961538462), (-11.8882130364, -28.6373078299), (-11.3369186666, -27.2346153846))
        make_face()
        with BuildLine():
            ThreePointArc((-19.9306920455, -25.6713364394), (-18.8565295584, -24.61414841), (-17.9174094521, -23.4353672582))
            ThreePointArc((-17.9174094521, -23.4353672582), (-19.0922045153, -22.4886132686), (-20.2170562899, -21.4830313264))
            ThreePointArc((-20.2170562899, -21.4830313264), (-21.142863238, -22.6693860948), (-22.244388762, -23.6946654039))
            ThreePointArc((-22.244388762, -23.6946654039), (-21.1106884629, -24.7100957631), (-19.9306920455, -25.6713364394))
        make_face()
        with BuildLine():
            ThreePointArc((12.5, -32.5), (12.4415341404, -31.292428788), (12.2666834829, -30.0961538462))
            ThreePointArc((12.2666834829, -30.0961538462), (10.8442264294, -30.6374403818), (9.3979877929, -31.1115384615))
            ThreePointArc((9.3979877929, -31.1115384615), (9.4744626242, -31.8038980078), (9.5, -32.5))
            ThreePointArc((9.5, -32.5), (-0.6961019922, -41.9744626242), (-9.3979877929, -31.1115384615))
            ThreePointArc((-9.3979877929, -31.1115384615), (-10.8442264294, -30.6374403818), (-12.2666834829, -30.0961538462))
            ThreePointArc((-12.2666834829, -30.0961538462), (-1.207571212, -44.9415341404), (12.5, -32.5))
        make_face()
        with BuildLine():
            ThreePointArc((-8.496322734, -28.25), (-9.9296081288, -27.7786407588), (-11.3369186666, -27.2346153846))
            ThreePointArc((-11.3369186666, -27.2346153846), (-11.8882130364, -28.6373078299), (-12.2666834829, -30.0961538462))
            ThreePointArc((-12.2666834829, -30.0961538462), (-10.8442264294, -30.6374403818), (-9.3979877929, -31.1115384615))
            ThreePointArc((-9.3979877929, -31.1115384615), (-9.0608326273, -29.6449497203), (-8.496322734, -28.25))
        make_face()
        with BuildLine():
            ThreePointArc((-20.2170562899, 21.4830313264), (-19.0922045153, 22.4886132686), (-17.9174094521, 23.4353672582))
            ThreePointArc((-17.9174094521, 23.4353672582), (-18.8565295584, 24.61414841), (-19.9306920455, 25.6713364394))
            ThreePointArc((-19.9306920455, 25.6713364394), (-21.1106884629, 24.7100957631), (-22.244388762, 23.6946654039))
            ThreePointArc((-22.244388762, 23.6946654039), (-21.142863238, 22.6693860948), (-20.2170562899, 21.4830313264))
        make_face()
        with BuildLine():
            ThreePointArc((-32.1973755284, 4.4248174067), (-30.7447425948, 4.0231594198), (-29.2543281187, 3.7992481264))
            ThreePointArc((-29.2543281187, 3.7992481264), (-29.0218126442, 5.2900274902), (-28.7133790239, 6.7669686736))
            ThreePointArc((-28.7133790239, 6.7669686736), (-30.2036958653, 6.9755636254), (-31.642376555, 7.4168730576))
            ThreePointArc((-31.642376555, 7.4168730576), (-31.9549148923, 5.9273446187), (-32.1973755284, 4.4248174067))
        make_face()
        with BuildLine():
            ThreePointArc((-29.2543281187, -3.7992481264), (-29.5, 0), (-29.2543281187, 3.7992481264))
            ThreePointArc((-29.2543281187, 3.7992481264), (-30.7447425948, 4.0231594198), (-32.1973755284, 4.4248174067))
            ThreePointArc((-32.1973755284, 4.4248174067), (-32.5, 0), (-32.1973755284, -4.4248174067))
            ThreePointArc((-32.1973755284, -4.4248174067), (-30.7447425948, -4.0231594198), (-29.2543281187, -3.7992481264))
        make_face()
        with BuildLine():
            ThreePointArc((-28.7133790239, -6.7669686736), (-29.0218126442, -5.2900274902), (-29.2543281187, -3.7992481264))
            ThreePointArc((-29.2543281187, -3.7992481264), (-30.7447425948, -4.0231594198), (-32.1973755284, -4.4248174067))
            ThreePointArc((-32.1973755284, -4.4248174067), (-31.9549148923, -5.9273446187), (-31.642376555, -7.4168730576))
            ThreePointArc((-31.642376555, -7.4168730576), (-30.2036958653, -6.9755636254), (-28.7133790239, -6.7669686736))
        make_face()
        with BuildLine():
            ThreePointArc((-32.1973755284, -4.4248174067), (-38.9711431703, -22.5), (-19.9306920455, -25.6713364394))
            ThreePointArc((-19.9306920455, -25.6713364394), (-21.1106884629, -24.7100957631), (-22.244388762, -23.6946654039))
            ThreePointArc((-22.244388762, -23.6946654039), (-36.3730669589, -21), (-31.642376555, -7.4168730576))
            ThreePointArc((-31.642376555, -7.4168730576), (-31.9549148923, -5.9273446187), (-32.1973755284, -4.4248174067))
        make_face()
        with BuildLine():
            ThreePointArc((-22.244388762, 23.6946654039), (-21.1106884629, 24.7100957631), (-19.9306920455, 25.6713364394))
            ThreePointArc((-19.9306920455, 25.6713364394), (-38.9711431703, 22.5), (-32.1973755284, 4.4248174067))
            ThreePointArc((-32.1973755284, 4.4248174067), (-31.9549148923, 5.9273446187), (-31.642376555, 7.4168730576))
            ThreePointArc((-31.642376555, 7.4168730576), (-36.3730669589, 21), (-22.244388762, 23.6946654039))
        make_face()
    extrude(amount=F1_DEPTH)


solid = f1.part
